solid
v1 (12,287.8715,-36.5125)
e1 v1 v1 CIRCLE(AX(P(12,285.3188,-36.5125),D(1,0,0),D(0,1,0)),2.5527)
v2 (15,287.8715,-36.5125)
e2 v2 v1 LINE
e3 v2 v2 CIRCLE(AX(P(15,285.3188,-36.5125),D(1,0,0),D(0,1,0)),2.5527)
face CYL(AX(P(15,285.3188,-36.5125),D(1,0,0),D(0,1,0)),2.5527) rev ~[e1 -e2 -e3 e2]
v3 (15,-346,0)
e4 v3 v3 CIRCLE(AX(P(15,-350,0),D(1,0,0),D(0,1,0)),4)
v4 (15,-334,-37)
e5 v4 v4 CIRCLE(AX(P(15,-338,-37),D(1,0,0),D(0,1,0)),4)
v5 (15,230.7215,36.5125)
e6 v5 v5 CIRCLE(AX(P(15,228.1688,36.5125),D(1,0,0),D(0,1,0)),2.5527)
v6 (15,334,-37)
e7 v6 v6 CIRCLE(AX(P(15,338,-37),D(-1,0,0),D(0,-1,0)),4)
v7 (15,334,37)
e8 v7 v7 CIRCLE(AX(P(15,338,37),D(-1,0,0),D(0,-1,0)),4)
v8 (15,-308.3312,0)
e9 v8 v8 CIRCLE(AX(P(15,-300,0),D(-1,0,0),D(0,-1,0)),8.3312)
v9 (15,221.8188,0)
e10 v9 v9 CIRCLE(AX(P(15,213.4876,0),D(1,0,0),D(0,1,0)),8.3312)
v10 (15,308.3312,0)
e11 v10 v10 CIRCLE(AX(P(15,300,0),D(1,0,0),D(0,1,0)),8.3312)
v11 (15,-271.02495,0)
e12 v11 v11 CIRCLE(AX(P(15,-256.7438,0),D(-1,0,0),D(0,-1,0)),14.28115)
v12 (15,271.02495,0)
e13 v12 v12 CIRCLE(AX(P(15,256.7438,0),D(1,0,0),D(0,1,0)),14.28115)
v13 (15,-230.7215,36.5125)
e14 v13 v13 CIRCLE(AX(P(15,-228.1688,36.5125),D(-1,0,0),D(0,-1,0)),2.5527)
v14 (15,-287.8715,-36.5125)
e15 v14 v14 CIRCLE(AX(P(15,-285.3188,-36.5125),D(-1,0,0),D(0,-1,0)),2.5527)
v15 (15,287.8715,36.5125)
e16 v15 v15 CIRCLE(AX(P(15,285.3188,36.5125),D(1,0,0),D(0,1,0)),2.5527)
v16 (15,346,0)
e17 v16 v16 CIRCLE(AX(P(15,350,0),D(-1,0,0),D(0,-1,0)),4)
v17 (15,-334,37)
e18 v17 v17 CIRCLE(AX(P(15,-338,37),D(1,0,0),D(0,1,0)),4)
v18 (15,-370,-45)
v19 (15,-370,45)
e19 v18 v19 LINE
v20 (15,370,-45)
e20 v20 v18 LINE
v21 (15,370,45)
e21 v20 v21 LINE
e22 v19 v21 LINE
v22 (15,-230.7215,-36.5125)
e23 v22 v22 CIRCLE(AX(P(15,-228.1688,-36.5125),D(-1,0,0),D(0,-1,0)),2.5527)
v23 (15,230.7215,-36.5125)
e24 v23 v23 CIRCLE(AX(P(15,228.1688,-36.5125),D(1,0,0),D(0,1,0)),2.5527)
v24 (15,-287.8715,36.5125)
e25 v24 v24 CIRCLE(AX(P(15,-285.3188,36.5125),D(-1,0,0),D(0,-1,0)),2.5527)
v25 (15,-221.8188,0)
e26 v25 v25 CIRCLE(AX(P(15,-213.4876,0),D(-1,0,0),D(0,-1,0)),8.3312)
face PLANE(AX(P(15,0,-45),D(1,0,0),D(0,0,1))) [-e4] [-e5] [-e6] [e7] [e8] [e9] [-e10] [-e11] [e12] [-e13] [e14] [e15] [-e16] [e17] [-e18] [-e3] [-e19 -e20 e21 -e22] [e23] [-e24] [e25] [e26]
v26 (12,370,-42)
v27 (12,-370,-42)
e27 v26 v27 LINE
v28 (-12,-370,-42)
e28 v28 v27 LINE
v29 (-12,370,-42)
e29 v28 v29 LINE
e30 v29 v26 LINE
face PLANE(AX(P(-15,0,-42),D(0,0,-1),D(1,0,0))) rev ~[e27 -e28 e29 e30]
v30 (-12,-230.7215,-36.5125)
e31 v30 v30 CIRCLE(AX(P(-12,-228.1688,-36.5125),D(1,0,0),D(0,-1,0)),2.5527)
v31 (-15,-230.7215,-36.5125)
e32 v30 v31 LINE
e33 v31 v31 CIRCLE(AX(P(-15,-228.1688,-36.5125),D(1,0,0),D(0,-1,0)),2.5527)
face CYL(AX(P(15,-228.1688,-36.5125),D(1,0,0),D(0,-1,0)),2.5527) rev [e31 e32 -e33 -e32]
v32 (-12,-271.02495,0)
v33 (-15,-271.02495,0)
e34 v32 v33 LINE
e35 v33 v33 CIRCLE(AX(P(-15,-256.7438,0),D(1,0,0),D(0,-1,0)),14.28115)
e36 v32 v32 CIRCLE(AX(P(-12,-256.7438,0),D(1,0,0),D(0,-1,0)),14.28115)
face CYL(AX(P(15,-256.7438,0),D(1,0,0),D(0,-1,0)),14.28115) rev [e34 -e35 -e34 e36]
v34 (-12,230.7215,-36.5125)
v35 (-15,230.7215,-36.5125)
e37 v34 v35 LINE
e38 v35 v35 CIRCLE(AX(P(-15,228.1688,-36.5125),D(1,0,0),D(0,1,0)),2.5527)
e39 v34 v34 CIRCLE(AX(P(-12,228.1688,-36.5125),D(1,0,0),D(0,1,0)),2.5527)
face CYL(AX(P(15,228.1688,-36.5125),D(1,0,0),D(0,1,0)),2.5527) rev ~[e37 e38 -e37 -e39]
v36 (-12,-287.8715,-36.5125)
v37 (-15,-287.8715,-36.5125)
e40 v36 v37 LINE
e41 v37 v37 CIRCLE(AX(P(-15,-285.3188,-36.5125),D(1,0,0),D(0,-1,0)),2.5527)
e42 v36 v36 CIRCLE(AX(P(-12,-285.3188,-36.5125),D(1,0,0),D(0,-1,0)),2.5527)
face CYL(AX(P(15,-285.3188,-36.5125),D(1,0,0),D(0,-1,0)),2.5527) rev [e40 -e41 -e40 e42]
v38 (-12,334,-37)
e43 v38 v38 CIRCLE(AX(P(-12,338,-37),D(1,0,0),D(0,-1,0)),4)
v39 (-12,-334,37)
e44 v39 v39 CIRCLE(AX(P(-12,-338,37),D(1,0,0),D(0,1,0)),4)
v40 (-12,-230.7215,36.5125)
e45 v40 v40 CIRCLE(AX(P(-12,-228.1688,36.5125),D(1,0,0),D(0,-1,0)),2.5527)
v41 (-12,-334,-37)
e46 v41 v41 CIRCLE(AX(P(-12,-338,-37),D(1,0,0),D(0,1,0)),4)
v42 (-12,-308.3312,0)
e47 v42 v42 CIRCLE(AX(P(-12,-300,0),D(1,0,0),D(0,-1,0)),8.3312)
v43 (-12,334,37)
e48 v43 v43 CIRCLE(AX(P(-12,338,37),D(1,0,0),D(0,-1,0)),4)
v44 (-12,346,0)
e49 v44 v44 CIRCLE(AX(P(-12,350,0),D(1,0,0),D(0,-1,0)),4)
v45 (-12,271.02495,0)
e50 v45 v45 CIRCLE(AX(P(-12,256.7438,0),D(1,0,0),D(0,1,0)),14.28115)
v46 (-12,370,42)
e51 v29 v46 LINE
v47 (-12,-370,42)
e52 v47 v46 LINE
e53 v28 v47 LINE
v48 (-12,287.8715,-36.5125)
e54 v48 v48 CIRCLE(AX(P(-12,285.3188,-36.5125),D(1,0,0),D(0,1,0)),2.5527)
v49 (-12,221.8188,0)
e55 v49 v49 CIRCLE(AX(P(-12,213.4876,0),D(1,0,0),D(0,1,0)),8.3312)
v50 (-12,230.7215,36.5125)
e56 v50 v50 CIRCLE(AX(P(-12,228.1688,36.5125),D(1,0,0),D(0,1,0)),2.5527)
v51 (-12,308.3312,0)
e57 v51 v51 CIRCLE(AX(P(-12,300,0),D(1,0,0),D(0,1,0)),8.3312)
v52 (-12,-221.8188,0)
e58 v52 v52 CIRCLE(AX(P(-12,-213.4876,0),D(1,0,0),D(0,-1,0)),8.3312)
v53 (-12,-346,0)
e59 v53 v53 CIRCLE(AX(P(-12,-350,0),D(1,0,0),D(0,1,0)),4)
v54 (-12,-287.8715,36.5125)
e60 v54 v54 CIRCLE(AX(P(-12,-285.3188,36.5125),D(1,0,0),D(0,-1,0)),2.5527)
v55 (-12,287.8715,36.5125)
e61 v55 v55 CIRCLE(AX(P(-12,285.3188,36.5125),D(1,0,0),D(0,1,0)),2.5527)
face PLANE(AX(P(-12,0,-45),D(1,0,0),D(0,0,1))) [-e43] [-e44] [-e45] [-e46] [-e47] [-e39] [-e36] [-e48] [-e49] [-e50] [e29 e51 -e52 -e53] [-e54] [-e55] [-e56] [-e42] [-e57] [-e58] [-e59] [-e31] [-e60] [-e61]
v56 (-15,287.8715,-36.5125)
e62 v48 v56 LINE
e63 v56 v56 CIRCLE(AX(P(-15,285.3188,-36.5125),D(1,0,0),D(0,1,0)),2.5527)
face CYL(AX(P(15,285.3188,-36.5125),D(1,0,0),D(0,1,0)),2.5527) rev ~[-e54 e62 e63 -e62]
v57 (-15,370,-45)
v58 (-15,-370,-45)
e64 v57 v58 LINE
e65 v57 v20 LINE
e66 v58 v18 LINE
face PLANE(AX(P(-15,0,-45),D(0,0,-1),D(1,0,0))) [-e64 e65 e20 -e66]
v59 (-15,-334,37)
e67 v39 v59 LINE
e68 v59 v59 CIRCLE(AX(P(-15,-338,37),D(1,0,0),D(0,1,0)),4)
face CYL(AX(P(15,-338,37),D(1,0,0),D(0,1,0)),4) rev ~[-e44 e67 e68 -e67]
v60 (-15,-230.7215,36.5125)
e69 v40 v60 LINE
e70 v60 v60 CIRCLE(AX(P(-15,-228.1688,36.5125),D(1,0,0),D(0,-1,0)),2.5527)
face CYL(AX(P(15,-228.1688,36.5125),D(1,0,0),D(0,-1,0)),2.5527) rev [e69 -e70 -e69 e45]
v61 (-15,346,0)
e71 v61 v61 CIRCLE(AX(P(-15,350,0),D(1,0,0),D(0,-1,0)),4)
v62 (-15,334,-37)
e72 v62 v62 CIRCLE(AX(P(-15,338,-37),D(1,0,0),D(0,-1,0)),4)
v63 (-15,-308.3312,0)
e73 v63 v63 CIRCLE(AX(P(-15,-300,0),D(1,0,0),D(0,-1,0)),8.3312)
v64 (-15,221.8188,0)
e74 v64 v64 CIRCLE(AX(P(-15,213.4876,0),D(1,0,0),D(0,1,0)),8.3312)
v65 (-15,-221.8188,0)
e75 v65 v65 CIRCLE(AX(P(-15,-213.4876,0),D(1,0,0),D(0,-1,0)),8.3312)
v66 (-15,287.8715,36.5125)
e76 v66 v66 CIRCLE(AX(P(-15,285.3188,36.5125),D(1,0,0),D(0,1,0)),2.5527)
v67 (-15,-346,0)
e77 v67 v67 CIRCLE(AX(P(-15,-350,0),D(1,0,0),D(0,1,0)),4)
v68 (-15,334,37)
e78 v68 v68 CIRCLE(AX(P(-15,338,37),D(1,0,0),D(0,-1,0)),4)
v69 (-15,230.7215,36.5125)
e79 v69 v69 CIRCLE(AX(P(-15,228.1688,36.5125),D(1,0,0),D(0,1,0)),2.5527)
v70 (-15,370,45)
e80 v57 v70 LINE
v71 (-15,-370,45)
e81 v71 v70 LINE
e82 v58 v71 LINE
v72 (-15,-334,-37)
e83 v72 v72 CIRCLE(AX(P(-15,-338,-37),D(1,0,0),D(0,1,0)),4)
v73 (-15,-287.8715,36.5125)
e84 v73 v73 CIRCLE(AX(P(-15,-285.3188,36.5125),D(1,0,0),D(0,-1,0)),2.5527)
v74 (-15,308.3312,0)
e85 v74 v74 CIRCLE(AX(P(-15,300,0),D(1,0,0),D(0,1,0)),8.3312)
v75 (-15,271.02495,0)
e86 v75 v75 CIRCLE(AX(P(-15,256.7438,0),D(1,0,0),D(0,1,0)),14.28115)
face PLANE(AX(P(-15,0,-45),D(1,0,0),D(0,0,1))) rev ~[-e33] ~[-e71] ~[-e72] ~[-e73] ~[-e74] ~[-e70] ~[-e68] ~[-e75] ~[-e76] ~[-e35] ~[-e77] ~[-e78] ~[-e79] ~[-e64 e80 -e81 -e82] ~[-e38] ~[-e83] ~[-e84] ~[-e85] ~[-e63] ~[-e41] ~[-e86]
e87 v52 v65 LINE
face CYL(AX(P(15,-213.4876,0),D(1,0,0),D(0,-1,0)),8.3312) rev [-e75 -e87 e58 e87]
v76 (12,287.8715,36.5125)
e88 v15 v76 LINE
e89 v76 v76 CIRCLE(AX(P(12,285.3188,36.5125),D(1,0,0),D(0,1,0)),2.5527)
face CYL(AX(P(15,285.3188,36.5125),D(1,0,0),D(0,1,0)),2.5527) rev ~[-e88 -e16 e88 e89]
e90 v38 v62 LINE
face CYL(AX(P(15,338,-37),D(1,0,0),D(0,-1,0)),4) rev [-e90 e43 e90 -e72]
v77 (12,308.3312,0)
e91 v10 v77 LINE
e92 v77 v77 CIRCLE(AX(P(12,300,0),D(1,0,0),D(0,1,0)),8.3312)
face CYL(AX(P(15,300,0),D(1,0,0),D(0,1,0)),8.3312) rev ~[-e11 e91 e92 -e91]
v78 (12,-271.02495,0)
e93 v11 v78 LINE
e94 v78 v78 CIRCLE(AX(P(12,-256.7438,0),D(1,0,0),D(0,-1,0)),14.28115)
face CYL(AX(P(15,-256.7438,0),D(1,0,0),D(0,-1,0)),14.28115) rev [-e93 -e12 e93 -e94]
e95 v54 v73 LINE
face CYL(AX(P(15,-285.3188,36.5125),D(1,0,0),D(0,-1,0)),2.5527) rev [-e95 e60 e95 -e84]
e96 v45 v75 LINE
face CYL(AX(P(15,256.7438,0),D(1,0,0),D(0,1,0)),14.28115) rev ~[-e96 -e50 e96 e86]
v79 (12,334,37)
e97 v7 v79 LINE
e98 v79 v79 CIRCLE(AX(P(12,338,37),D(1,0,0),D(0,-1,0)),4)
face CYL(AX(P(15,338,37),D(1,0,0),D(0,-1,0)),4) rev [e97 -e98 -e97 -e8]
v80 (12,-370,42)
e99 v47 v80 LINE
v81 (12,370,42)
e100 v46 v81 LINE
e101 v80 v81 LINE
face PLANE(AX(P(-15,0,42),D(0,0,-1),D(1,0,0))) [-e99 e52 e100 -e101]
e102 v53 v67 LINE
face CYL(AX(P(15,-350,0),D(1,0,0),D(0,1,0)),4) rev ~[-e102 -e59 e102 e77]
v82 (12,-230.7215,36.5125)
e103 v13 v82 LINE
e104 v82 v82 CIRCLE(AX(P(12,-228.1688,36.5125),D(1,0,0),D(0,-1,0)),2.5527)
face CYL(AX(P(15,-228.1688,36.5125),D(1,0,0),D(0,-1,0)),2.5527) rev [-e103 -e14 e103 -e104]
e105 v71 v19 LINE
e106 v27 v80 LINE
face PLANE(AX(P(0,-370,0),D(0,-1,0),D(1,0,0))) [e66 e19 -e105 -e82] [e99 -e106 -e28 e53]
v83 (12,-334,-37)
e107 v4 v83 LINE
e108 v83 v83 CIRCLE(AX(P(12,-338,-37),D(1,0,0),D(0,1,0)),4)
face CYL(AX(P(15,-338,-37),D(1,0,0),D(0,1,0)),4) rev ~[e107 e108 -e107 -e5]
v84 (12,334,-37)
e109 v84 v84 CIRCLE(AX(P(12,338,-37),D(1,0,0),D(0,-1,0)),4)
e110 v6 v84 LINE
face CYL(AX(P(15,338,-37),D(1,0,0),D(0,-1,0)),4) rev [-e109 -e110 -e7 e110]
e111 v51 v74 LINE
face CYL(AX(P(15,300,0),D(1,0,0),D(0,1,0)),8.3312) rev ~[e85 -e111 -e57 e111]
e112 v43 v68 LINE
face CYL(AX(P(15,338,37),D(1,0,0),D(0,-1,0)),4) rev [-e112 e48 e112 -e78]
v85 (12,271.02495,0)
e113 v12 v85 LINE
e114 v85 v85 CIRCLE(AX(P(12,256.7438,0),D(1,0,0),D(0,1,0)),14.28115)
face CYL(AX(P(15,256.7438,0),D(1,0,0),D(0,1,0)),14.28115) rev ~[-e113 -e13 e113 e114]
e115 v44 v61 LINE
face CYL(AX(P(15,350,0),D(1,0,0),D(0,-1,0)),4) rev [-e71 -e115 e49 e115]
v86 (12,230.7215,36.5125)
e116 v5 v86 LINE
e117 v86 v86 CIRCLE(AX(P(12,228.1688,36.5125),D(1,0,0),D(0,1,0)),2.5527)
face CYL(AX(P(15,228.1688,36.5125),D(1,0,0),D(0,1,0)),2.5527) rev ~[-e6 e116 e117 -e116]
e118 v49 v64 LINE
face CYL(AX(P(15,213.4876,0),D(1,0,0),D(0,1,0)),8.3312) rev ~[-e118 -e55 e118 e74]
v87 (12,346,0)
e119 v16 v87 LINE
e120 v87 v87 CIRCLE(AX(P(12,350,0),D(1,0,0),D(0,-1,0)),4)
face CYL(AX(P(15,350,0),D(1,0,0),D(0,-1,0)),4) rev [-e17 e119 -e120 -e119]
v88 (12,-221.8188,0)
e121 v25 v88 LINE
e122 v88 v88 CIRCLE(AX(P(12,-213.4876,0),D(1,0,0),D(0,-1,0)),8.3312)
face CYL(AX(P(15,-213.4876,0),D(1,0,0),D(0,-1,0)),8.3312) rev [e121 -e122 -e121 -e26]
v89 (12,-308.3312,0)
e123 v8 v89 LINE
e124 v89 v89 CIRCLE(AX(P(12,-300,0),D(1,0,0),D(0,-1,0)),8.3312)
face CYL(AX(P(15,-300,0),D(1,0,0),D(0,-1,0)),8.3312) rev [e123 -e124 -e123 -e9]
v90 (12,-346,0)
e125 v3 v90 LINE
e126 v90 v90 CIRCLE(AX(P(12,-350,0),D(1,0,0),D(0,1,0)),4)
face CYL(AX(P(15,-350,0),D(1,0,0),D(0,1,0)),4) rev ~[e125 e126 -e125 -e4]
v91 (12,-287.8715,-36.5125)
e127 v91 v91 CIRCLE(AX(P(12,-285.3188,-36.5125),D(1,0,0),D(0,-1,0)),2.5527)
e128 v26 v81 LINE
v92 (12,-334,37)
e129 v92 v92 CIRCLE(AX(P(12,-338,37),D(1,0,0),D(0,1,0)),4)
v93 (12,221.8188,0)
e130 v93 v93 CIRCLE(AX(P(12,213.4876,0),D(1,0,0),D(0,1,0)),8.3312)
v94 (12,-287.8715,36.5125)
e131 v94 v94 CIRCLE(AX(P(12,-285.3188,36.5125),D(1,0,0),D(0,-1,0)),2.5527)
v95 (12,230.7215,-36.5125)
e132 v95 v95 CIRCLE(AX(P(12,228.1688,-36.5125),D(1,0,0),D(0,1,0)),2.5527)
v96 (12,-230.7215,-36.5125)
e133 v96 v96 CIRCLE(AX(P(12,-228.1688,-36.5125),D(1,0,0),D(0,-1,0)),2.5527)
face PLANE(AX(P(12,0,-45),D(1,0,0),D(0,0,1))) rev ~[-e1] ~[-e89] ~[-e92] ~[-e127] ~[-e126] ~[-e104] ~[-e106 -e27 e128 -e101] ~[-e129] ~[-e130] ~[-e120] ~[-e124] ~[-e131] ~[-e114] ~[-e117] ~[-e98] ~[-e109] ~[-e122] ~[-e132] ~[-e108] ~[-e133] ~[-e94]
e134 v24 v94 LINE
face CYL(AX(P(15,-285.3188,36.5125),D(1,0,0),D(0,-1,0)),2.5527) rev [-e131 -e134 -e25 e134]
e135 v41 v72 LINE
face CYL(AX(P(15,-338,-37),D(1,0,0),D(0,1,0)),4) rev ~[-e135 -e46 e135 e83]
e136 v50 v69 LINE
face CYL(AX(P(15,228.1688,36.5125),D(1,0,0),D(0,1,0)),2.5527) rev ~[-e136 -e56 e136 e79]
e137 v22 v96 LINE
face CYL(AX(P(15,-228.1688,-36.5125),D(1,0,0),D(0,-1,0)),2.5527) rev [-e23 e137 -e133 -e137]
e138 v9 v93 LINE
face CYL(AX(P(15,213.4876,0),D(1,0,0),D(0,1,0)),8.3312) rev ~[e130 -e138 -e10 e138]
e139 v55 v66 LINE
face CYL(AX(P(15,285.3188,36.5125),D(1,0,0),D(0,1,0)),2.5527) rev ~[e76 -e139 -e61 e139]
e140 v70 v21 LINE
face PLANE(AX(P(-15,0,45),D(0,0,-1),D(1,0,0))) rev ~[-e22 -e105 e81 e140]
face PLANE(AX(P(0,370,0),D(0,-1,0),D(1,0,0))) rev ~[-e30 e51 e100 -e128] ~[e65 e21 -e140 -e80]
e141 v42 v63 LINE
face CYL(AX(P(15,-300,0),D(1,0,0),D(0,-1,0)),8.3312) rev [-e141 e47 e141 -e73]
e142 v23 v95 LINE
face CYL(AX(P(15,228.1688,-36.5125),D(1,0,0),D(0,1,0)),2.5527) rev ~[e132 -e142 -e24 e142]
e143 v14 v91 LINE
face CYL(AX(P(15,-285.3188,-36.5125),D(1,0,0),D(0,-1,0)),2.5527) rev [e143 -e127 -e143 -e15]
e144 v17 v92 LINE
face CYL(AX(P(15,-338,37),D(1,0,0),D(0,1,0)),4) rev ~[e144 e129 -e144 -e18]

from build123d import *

# Parameters (mm, degrees)
F0_W     = 30
F0_H     = 90
F1_DEPTH = 370
F2_T     = -3
F3_R     = 2.5527
F3_R_2   = 14.28115
F3_R_3   = 8.3312
F4_DEPTH = 30.001
F5_R     = 4
F6_DEPTH = 30.001


# Not quite as in the source:
# - a pattern or mirror of a feature is missing from the dataset's text; its kind, count and spacing are read off the source's solid


with BuildPart() as f1:
    # F0 (on Front) → F1 (new body, symmetric)
    with BuildSketch(Plane.XZ):
        Rectangle(F0_W, F0_H)
    extrude(amount=F1_DEPTH, both=True)

    # F2
    f2_openings = [f1.faces().sort_by_distance(p)[0] for p in [
        (0, -370, 0),
        (0, 370, 0),
    ]]
    offset(amount=F2_T, openings=f2_openings)

    # F3 (on face) → F4 (cut, through all)
    with BuildSketch(Plane.YZ.offset(15)):
        with Locations((228.1688, 36.5125)):
            Circle(F3_R)
        with Locations((228.1688, -36.5125)):
            Circle(F3_R)
        with Locations((285.3188, -36.5125)):
            Circle(F3_R)
        with Locations((285.3188, 36.5125)):
            Circle(F3_R)
        with Locations((256.7438, 0)):
            Circle(F3_R_2)
        with Locations((213.4876, 0)):
            Circle(F3_R_3)
        with Locations((300, 0)):
            Circle(F3_R_3)
    f4 = extrude(amount=-F4_DEPTH, mode=Mode.SUBTRACT)

    # F4_copies: F4 across plane
    add(f4.mirror(Plane(origin=(0, 0, 0), x_dir=(0, 0, -1), z_dir=(0, -1, 0))), mode=Mode.SUBTRACT)

    # F5 (on face) → F6 (cut, through all)
    with BuildSketch(Plane.YZ.offset(15)):
        with Locations((-338, 37)):
            Circle(F5_R)
        with Locations((-350, 0)):
            Circle(F5_R)
        with Locations((-338, -37)):
            Circle(F5_R)
    f6 = extrude(amount=-F6_DEPTH, mode=Mode.SUBTRACT)

    # F6_copies: F6 across plane
    add(f6.mirror(Plane.ZX), mode=Mode.SUBTRACT)


solid = f1.part
